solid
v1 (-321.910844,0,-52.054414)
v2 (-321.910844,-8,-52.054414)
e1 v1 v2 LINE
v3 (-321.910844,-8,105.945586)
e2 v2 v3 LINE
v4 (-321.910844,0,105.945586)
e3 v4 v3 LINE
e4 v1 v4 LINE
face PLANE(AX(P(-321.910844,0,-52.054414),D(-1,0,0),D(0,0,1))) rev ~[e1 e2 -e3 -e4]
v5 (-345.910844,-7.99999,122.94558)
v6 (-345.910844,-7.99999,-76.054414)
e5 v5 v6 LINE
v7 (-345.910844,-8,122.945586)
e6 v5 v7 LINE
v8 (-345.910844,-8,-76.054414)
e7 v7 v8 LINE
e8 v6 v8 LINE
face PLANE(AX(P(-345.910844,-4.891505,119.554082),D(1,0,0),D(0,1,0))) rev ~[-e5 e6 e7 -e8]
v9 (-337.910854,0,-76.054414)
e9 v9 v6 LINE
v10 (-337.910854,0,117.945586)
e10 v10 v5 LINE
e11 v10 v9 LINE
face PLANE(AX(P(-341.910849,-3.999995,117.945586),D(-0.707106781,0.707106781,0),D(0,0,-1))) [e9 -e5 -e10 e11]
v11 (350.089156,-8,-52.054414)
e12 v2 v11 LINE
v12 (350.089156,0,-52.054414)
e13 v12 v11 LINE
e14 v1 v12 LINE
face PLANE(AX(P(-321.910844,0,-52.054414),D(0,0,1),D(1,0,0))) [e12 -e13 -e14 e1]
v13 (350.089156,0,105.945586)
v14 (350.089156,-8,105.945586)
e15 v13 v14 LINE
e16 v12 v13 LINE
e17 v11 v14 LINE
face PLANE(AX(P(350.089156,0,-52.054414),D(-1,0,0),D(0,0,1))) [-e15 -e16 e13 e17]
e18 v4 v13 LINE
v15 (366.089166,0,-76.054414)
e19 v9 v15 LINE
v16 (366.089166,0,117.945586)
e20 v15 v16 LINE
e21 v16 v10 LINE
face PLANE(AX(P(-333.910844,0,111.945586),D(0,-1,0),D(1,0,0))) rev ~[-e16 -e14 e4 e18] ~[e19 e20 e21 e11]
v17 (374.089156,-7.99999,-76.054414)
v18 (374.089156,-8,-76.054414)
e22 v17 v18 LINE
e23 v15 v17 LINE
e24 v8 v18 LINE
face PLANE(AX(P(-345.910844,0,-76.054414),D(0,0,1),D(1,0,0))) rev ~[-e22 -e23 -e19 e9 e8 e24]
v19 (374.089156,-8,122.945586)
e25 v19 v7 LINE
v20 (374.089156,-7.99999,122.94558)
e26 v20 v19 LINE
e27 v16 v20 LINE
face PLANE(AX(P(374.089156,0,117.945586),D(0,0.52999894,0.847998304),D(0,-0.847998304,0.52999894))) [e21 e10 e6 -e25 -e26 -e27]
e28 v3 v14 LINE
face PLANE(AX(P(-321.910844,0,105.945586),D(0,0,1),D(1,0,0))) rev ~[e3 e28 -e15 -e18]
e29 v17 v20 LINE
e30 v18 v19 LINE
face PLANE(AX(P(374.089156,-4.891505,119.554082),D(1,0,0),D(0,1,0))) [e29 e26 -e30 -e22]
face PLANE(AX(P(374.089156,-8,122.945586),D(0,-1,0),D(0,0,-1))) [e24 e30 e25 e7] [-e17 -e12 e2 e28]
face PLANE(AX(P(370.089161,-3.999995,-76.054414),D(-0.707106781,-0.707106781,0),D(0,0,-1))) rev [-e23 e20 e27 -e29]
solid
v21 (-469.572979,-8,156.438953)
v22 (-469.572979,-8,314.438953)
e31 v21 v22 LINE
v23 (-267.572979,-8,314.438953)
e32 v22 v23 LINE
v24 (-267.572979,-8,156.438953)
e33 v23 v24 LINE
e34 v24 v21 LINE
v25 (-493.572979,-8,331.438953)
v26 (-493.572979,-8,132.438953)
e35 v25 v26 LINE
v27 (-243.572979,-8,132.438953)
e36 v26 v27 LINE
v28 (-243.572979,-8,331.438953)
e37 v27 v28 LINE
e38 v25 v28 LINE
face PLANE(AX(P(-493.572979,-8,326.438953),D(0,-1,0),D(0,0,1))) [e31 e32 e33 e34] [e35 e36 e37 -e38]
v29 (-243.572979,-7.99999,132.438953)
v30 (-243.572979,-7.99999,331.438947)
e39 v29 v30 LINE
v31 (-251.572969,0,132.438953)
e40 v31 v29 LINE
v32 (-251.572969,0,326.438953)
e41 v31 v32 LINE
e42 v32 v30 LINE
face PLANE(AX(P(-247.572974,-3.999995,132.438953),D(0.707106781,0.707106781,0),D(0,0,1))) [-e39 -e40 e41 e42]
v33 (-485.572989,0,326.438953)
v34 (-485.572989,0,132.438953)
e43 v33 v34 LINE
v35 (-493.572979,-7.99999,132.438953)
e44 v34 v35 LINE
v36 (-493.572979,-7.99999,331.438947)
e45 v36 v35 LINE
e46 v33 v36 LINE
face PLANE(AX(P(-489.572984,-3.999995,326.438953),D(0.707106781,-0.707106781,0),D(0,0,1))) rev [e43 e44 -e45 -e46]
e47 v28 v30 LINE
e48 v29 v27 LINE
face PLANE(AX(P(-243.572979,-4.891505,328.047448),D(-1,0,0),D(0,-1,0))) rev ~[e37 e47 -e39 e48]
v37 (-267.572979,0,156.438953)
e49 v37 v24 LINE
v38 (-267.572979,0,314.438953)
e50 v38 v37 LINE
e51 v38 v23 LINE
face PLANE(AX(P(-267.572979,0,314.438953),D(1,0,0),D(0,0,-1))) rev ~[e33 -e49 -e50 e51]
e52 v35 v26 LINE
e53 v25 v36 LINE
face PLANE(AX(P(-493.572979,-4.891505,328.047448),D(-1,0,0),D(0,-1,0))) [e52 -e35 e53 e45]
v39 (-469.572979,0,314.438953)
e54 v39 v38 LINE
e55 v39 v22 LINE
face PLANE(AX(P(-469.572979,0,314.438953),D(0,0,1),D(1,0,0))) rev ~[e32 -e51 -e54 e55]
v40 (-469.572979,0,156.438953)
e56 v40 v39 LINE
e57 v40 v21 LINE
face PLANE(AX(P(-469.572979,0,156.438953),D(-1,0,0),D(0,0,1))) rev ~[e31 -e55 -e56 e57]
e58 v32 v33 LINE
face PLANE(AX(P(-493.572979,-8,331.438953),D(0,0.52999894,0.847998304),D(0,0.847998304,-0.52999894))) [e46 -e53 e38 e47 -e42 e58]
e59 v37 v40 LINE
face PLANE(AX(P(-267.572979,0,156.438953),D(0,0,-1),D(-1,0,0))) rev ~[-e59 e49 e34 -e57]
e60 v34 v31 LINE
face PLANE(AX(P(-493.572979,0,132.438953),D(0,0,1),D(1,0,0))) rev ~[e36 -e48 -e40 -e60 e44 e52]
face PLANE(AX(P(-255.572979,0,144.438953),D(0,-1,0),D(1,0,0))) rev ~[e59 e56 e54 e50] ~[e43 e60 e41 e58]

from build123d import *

# Parameters (mm, degrees)
F0_W     = 24
F0_H     = 12
F0_W_2   = 672
F0_H_2   = 158
F0_H_3   = 24
F1_DEPTH = 8
F3_DEPTH = 720
F4_SIZE  = 7.99999
F5_W     = 24
F5_H     = 24
F5_W_2   = 202
F5_H_2   = 158
F5_H_3   = 12
F6_DEPTH = 8
F8_DEPTH = 250
F9_SIZE  = 7.99999


# Not quite as in the source:
# - a fillet or chamfer is up to 0.001 mm smaller than in the source, because OpenCascade refuses the exact size


with BuildPart() as f1:
    # F0 (on Front) → F1 (new body)
    with BuildSketch(Plane.XZ):
        with Locations((-333.9108440578, 111.9455863265)):
            Rectangle(F0_W, F0_H)
        with Locations((14.0891559422, 111.9455863265)):
            Rectangle(F0_W_2, F0_H)
        with Locations((-333.9108440578, 26.9455863265)):
            Rectangle(F0_W, F0_H_2)
        with Locations((-333.9108440578, -64.0544136735)):
            Rectangle(F0_W, F0_H_3)
        with Locations((14.0891559422, -64.0544136735)):
            Rectangle(F0_W_2, F0_H_3)
        with Locations((362.0891559422, 111.9455863265)):
            Rectangle(F0_W, F0_H)
        with Locations((362.0891559422, 26.9455863265)):
            Rectangle(F0_W, F0_H_2)
        with Locations((362.0891559422, -64.0544136735)):
            Rectangle(F0_W, F0_H_3)
    extrude(amount=F1_DEPTH)

    # F2 (on face) → F3 (join)
    with BuildSketch(Plane.YZ.offset(374.0891559422)):
        Polygon((-8, 122.9455863265), (-8, 117.9455863265), (0, 117.9455863265), align=None)
    extrude(amount=-F3_DEPTH)

    # F4 (size 8 in the source; OpenCascade refuses exactly that, so slightly less here)
    f4_edges = [f1.edges().sort_by_distance(p)[0] for p in [
        (374.089156, 0, 20.945586),
        (-345.910844, 0, 20.945586),
    ]]
    chamfer(f4_edges, length=F4_SIZE)


with BuildPart() as f6:
    # F5 (on Front) → F6 (new body)
    with BuildSketch(Plane.XZ):
        with Locations((-255.5729791075, 144.4389531016)):
            Rectangle(F5_W, F5_H)
        with Locations((-368.5729791075, 144.4389531016)):
            Rectangle(F5_W_2, F5_H)
        with Locations((-255.5729791075, 235.4389531016)):
            Rectangle(F5_W, F5_H_2)
        with Locations((-481.5729791075, 144.4389531016)):
            Rectangle(F5_W, F5_H)
        with Locations((-255.5729791075, 320.4389531016)):
            Rectangle(F5_W, F5_H_3)
        with Locations((-481.5729791075, 235.4389531016)):
            Rectangle(F5_W, F5_H_2)
        with Locations((-368.5729791075, 320.4389531016)):
            Rectangle(F5_W_2, F5_H_3)
        with Locations((-481.5729791075, 320.4389531016)):
            Rectangle(F5_W, F5_H_3)
    extrude(amount=F6_DEPTH)

    # F7 (on face) → F8 (join)
    with BuildSketch(Plane(origin=(-493.5729791075, 0, 0), x_dir=(0, -1, 0), z_dir=(-1, 0, 0))):
        Polygon((0, 326.4389531016), (8, 326.4389531016), (8, 331.4389531016), align=None)
    extrude(amount=-F8_DEPTH)

    # F9 (size 8 in the source; OpenCascade refuses exactly that, so slightly less here)
    f9_edges = [f6.edges().sort_by_distance(p)[0] for p in [
        (-493.572979, 0, 229.438953),
        (-243.572979, 0, 229.438953),
    ]]
    chamfer(f9_edges, length=F9_SIZE)


solid = Compound([f1.part, f6.part])
